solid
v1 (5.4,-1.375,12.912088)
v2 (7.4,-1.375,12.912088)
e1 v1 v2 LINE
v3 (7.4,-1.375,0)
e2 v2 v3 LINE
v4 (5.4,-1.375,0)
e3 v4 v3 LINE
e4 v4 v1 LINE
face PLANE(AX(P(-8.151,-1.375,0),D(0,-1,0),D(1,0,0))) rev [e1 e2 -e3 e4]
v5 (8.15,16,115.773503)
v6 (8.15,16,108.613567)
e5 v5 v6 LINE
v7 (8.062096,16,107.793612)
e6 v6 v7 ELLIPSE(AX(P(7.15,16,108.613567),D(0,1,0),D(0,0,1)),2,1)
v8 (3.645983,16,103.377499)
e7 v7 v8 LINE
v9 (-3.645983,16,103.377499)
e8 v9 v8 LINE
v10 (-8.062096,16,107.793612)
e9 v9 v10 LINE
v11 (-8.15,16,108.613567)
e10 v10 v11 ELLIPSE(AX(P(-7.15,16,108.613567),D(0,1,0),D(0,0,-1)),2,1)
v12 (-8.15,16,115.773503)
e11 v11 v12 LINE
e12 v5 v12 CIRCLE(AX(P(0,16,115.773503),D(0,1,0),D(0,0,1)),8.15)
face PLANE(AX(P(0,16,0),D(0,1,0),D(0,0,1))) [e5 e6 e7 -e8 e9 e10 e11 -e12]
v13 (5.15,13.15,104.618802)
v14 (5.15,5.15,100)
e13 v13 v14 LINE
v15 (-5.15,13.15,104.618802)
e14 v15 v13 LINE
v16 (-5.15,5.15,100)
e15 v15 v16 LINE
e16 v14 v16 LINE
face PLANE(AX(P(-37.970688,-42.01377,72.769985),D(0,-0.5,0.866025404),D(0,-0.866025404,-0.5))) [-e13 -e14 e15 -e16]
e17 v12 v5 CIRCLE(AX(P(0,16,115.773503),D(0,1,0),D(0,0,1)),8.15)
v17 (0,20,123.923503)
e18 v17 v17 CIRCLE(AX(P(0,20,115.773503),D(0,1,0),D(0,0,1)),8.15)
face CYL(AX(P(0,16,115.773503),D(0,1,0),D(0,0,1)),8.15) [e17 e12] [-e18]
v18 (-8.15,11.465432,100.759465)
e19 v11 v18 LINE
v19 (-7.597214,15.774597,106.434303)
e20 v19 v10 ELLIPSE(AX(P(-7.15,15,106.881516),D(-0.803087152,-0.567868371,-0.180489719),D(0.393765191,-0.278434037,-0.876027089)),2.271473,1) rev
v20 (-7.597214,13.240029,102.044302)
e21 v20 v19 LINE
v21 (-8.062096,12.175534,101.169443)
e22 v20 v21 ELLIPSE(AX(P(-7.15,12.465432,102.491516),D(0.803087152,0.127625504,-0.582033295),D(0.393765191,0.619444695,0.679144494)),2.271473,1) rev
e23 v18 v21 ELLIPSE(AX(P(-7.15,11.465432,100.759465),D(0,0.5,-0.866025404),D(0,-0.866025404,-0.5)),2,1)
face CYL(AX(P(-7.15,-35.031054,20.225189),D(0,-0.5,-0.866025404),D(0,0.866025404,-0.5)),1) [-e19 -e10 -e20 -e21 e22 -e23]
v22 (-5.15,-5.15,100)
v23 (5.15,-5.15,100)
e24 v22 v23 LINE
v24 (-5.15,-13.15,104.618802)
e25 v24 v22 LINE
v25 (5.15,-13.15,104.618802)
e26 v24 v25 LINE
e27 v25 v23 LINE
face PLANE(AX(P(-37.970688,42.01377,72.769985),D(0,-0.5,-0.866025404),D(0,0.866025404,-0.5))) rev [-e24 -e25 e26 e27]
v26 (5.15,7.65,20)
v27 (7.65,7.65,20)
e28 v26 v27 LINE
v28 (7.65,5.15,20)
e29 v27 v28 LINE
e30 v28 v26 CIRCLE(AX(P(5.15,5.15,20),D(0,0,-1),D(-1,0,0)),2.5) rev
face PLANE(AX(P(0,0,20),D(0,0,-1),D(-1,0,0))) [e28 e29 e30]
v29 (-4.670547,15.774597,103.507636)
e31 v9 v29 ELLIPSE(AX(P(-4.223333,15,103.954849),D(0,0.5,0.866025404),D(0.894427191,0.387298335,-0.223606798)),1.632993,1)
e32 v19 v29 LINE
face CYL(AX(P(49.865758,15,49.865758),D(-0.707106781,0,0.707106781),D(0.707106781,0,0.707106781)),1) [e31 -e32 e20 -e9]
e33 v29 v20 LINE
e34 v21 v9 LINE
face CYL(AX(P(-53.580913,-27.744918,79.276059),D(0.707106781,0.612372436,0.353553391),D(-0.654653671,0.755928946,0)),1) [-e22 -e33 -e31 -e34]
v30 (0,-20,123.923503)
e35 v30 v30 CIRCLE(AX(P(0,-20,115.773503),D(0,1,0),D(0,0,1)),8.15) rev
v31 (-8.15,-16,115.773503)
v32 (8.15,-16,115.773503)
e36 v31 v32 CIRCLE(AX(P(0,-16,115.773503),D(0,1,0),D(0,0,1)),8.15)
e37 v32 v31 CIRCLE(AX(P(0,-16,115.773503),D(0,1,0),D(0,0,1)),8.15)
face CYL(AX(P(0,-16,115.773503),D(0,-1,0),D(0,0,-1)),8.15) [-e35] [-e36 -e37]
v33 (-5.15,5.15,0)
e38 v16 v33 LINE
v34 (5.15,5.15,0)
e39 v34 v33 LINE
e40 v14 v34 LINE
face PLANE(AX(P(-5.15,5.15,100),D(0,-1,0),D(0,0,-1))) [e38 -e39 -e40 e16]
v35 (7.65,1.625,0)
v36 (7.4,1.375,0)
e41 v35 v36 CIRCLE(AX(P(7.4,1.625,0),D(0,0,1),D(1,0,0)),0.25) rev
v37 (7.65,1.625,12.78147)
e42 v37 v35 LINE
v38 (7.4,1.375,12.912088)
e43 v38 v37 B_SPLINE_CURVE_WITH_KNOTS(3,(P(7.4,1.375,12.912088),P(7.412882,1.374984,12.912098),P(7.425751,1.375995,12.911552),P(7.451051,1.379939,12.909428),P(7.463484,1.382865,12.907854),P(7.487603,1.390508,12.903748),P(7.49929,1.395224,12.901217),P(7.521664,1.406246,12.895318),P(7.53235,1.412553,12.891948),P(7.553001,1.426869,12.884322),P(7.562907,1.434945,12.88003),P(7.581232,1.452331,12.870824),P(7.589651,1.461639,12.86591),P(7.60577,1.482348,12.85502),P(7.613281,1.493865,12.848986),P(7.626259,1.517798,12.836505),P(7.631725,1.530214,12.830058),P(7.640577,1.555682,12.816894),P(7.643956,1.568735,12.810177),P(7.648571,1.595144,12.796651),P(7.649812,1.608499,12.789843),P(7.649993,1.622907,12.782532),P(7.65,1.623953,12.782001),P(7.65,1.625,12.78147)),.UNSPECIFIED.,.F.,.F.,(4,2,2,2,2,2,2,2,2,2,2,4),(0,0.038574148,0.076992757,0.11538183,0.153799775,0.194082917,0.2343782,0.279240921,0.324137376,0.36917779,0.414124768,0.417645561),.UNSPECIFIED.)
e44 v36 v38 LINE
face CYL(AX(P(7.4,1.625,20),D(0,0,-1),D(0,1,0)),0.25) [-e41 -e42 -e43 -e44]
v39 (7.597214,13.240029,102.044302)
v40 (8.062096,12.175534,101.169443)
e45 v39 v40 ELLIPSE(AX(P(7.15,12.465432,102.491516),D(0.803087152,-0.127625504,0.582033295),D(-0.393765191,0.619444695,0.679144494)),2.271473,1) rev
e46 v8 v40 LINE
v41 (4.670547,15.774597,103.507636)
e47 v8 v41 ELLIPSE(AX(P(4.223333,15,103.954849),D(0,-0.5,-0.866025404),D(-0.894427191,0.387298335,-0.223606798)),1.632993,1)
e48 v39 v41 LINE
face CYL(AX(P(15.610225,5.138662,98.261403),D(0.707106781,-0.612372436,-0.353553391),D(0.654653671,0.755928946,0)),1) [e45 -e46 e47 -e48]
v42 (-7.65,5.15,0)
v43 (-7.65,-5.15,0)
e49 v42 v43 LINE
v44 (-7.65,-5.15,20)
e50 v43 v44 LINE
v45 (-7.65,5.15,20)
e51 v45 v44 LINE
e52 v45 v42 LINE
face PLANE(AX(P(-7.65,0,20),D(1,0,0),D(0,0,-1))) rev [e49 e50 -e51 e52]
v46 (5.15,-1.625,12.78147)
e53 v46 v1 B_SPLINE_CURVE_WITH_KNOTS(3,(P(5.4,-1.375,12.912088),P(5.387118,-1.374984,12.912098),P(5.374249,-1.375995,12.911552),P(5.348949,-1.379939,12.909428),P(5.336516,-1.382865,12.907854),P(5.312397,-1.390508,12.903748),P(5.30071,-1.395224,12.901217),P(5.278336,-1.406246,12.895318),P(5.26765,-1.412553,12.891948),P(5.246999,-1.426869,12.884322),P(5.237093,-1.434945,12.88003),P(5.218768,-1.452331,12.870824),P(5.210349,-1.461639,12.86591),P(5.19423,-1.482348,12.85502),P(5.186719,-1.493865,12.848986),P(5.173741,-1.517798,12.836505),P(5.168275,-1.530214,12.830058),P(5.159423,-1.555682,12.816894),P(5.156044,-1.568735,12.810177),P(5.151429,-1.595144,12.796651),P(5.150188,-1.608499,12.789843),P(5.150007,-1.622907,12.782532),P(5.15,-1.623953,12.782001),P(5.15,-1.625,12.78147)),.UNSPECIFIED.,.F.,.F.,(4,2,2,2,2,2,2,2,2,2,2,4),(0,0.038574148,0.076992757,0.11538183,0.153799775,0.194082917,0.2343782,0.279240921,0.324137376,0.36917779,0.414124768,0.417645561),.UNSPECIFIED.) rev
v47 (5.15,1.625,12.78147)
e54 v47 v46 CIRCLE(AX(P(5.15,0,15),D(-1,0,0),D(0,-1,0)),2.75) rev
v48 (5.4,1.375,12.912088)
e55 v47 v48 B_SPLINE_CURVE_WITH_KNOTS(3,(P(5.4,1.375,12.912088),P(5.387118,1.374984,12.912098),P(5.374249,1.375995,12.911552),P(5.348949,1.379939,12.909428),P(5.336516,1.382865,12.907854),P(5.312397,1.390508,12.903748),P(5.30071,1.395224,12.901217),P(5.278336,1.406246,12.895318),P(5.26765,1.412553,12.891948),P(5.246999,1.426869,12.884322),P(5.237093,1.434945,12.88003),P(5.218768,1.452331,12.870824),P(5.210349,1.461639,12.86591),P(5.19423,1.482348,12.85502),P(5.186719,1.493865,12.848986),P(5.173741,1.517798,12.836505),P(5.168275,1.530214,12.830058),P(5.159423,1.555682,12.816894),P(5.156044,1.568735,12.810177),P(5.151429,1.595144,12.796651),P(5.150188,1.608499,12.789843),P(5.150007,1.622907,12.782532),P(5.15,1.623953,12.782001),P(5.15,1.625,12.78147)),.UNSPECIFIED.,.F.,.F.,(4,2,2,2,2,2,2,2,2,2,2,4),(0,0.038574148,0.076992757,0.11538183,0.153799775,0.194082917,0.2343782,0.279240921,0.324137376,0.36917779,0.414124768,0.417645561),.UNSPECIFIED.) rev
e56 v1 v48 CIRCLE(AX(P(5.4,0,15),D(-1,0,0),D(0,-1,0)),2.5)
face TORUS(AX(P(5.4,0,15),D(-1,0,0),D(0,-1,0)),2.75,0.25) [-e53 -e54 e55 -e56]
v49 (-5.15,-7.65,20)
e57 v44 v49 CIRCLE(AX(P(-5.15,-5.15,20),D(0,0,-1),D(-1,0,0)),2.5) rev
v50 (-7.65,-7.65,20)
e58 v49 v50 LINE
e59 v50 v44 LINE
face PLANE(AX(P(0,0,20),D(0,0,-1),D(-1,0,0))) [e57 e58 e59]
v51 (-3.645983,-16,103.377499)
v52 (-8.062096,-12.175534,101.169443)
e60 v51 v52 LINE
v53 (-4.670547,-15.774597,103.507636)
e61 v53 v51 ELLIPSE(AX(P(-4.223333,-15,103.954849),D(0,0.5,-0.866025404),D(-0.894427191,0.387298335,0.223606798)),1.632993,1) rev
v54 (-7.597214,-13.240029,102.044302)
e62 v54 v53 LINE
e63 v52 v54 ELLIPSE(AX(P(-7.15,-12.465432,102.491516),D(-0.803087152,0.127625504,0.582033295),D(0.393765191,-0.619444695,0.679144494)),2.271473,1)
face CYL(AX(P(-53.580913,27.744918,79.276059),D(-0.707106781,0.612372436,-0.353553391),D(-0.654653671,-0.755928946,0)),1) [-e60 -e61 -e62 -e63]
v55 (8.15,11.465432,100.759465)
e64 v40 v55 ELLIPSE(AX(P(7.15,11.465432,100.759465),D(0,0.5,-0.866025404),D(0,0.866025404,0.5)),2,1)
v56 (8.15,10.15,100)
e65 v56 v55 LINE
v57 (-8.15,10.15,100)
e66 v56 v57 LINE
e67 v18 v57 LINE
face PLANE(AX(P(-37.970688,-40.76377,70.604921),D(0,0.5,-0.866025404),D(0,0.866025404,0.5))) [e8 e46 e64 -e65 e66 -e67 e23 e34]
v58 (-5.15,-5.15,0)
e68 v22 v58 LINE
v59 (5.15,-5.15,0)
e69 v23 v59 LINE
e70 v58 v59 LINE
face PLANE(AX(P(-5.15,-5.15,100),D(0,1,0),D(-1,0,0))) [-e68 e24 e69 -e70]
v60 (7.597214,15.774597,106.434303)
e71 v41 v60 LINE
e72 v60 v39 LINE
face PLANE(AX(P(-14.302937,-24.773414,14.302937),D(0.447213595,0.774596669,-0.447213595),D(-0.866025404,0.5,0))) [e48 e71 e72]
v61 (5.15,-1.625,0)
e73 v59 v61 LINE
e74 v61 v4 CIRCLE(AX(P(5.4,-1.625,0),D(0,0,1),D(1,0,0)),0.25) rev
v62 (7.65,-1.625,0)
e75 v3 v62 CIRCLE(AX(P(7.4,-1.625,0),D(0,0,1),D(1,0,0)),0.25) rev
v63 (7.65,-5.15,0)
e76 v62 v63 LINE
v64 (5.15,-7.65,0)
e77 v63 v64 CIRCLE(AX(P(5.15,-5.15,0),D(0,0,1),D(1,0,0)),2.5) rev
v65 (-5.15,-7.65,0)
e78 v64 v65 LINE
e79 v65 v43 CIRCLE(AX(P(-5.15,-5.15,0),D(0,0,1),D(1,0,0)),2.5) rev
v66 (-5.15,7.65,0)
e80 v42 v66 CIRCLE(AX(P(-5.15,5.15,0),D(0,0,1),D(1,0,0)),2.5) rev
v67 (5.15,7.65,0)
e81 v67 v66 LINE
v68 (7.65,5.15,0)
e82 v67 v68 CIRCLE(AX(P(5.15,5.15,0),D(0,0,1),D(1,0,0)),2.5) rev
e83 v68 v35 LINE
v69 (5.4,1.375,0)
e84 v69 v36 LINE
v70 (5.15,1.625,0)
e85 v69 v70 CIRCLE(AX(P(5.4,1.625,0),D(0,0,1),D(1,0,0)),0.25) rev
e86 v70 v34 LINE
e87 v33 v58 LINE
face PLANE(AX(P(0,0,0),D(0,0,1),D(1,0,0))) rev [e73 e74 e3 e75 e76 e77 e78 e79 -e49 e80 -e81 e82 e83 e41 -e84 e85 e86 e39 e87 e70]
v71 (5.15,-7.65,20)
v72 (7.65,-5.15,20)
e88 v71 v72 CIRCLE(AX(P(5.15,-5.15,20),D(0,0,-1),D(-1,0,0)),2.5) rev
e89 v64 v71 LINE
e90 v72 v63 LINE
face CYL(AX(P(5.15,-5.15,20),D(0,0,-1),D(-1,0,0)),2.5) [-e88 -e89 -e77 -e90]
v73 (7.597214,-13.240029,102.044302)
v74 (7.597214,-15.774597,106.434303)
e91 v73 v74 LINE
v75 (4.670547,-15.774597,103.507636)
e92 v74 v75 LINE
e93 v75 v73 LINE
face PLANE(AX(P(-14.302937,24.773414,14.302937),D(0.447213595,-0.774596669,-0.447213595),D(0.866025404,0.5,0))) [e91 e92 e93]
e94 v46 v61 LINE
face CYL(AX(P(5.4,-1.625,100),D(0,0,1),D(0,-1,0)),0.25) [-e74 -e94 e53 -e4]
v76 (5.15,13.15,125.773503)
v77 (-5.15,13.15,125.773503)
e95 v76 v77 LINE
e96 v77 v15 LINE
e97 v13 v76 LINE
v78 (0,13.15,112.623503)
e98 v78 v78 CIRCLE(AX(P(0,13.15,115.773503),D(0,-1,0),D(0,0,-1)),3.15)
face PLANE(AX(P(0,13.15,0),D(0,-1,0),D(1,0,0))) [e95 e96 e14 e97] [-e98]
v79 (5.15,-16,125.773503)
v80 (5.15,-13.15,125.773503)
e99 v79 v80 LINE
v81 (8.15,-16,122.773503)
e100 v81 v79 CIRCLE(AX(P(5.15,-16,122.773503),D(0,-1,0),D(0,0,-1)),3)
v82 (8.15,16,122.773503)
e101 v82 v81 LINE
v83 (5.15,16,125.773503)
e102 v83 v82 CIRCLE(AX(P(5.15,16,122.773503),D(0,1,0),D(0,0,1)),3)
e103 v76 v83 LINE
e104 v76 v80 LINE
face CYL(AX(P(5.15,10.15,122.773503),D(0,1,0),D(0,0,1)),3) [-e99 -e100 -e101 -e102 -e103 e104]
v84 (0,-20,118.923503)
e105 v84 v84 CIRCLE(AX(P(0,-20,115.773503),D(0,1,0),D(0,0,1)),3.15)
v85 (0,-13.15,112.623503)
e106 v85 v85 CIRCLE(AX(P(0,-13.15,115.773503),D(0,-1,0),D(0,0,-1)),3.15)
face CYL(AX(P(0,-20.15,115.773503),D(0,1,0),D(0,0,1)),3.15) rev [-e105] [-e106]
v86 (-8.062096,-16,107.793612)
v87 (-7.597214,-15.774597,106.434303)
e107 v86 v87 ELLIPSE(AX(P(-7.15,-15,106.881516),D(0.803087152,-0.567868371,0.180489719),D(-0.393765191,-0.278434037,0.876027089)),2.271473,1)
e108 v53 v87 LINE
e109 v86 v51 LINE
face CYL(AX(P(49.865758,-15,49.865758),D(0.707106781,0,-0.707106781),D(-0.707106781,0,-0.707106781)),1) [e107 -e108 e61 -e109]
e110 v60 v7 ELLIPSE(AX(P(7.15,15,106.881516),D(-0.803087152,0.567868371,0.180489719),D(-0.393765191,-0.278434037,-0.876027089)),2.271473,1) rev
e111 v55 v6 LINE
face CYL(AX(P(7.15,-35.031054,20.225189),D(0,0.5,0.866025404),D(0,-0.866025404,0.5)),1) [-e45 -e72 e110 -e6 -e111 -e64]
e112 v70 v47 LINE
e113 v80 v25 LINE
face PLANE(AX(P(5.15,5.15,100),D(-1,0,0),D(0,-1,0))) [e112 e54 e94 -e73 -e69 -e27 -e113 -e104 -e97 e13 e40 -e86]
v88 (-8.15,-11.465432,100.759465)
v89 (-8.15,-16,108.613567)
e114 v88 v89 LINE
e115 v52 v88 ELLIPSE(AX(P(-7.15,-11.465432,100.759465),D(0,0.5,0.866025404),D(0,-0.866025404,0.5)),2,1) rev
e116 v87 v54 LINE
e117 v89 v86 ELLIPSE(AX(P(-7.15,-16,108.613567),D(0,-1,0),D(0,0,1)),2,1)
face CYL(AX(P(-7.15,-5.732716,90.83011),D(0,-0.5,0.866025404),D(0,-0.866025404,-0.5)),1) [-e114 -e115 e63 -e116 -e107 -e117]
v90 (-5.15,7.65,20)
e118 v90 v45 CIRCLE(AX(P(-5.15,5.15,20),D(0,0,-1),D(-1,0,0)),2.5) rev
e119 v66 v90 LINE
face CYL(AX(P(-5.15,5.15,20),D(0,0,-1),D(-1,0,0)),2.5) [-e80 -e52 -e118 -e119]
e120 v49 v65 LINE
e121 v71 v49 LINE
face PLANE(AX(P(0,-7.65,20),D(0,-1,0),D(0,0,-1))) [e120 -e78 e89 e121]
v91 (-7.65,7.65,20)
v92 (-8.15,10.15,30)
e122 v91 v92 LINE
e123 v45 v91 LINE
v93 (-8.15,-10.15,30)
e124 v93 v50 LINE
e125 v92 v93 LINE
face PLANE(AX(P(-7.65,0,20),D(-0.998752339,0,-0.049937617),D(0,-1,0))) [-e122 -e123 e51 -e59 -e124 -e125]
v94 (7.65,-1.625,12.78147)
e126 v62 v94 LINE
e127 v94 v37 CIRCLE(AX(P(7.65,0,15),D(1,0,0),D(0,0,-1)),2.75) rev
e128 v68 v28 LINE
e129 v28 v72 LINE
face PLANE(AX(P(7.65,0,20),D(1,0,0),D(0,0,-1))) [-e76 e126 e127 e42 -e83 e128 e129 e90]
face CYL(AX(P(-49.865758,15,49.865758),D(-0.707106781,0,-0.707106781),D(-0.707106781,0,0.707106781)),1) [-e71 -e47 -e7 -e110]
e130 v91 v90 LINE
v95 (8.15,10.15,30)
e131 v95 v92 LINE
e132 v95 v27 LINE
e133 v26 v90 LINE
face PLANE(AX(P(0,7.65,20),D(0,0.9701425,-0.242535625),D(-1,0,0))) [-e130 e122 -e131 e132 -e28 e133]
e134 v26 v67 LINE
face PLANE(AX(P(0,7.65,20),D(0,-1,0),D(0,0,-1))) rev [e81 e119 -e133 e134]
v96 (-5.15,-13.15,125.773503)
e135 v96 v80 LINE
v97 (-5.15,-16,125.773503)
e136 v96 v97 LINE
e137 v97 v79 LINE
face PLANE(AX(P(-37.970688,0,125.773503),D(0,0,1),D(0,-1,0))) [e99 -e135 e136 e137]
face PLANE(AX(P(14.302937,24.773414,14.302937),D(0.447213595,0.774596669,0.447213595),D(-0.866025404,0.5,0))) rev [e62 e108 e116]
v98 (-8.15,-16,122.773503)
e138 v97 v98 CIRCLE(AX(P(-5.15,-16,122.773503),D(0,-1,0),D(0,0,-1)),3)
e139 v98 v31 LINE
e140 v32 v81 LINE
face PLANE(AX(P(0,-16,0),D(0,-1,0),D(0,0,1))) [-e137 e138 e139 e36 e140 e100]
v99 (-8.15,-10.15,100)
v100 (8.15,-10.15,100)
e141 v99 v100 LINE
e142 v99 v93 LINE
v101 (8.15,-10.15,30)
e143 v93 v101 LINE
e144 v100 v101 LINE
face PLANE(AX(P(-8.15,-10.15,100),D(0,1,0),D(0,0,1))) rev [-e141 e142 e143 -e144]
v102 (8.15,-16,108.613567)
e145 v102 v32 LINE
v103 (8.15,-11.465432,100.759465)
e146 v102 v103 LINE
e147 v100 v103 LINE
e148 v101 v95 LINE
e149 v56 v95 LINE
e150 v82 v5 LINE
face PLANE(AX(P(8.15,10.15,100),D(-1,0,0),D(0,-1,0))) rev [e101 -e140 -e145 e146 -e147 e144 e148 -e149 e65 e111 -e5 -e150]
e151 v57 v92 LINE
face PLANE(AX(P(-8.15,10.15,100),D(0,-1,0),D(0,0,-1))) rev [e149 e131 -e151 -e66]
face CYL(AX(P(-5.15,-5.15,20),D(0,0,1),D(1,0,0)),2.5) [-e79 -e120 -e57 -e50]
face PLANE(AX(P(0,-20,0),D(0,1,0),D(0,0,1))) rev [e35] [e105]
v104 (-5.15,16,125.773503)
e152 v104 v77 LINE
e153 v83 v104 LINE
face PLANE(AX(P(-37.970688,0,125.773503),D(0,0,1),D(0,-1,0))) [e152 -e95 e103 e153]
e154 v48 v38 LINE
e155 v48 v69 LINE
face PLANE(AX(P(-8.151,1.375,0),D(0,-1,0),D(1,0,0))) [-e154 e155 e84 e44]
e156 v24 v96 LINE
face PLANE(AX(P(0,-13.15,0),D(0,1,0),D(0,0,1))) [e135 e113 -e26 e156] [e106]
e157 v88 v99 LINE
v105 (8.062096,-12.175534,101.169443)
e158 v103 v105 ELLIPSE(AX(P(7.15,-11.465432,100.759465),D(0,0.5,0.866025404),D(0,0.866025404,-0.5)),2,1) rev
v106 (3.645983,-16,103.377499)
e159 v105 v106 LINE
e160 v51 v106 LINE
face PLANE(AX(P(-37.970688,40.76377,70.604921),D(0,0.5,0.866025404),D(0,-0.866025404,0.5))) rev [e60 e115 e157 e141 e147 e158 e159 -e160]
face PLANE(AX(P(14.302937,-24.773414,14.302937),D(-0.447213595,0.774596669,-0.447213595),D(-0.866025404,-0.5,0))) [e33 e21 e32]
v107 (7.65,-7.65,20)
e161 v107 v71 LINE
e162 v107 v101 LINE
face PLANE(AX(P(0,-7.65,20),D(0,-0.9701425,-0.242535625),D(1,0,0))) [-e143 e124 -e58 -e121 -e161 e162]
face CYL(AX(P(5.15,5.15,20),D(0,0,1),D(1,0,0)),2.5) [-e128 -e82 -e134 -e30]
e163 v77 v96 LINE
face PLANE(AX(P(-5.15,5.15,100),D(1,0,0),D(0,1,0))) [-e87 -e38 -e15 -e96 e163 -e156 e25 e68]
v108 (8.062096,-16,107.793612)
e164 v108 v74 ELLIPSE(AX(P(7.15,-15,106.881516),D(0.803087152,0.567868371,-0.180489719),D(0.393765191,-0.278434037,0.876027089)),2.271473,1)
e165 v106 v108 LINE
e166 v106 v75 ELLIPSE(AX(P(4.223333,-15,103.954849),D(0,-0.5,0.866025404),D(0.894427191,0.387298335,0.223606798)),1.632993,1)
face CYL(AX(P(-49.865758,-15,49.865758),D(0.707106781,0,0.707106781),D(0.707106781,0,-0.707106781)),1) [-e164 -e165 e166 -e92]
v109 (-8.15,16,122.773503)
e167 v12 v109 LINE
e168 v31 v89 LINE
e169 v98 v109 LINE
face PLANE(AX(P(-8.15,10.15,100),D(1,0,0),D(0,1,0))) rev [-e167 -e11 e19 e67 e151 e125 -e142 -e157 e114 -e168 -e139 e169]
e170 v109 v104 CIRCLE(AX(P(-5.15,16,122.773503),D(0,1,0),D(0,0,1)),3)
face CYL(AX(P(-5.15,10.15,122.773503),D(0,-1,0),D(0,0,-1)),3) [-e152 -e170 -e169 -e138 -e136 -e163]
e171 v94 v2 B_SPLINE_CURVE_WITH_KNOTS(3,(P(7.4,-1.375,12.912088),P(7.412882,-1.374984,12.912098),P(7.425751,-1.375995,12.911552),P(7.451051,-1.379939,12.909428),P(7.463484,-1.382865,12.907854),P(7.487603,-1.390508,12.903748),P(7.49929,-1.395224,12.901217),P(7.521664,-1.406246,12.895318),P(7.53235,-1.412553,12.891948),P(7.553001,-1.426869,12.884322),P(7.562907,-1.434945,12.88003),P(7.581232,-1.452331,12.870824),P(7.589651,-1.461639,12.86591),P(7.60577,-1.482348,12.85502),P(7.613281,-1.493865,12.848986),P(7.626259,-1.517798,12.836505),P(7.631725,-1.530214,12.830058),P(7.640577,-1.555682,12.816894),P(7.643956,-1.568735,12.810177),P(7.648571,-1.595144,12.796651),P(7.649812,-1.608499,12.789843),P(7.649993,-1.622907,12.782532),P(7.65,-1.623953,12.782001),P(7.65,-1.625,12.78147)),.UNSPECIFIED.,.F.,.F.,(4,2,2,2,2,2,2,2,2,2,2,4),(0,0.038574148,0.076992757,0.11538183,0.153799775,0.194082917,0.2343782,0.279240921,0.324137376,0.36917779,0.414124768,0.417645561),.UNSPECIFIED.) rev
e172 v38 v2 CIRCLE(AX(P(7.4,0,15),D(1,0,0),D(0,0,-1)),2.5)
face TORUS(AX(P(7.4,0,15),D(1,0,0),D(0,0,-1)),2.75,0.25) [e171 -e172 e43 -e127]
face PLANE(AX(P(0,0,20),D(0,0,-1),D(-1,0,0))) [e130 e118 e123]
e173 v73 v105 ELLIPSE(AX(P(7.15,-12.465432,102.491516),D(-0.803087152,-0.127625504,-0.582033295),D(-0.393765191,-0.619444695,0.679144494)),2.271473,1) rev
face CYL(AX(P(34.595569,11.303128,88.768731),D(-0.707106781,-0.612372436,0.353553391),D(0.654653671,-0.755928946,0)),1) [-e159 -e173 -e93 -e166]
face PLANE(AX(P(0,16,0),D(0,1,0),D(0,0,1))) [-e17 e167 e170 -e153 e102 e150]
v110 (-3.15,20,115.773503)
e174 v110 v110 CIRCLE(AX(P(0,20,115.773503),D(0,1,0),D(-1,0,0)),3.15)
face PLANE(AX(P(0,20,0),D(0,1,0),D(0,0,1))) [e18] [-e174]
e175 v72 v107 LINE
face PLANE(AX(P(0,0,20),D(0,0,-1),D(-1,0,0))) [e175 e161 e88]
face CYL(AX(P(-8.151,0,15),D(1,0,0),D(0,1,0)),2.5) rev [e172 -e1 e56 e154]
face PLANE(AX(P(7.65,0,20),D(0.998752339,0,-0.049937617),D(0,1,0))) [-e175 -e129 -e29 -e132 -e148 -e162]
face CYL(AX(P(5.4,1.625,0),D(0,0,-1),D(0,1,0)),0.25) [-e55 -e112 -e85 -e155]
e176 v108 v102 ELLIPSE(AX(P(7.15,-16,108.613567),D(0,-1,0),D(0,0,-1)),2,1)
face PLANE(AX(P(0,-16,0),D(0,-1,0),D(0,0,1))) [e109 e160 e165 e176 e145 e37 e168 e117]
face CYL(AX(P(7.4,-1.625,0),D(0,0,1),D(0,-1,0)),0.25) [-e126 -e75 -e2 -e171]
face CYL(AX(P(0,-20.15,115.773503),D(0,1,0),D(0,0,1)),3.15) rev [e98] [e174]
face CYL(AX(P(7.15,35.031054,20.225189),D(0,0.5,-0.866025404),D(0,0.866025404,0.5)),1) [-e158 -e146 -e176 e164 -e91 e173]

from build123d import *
from OCP.BRepFilletAPI import BRepFilletAPI_MakeChamfer

# Parameters (mm, degrees)
SKETCH_1_W          = 16.3
SKETCH_1_H          = 20.3
SKETCH_1_W_2        = 10.3
SKETCH_1_H_2        = 10.3
EXTRUDE_1_DEPTH     = 100
SKETCH_2_W          = 16.3
SKETCH_2_H          = 20.3
SKETCH_2_W_2        = 15.3
SKETCH_2_H_2        = 15.3
CUT_EXTRUDE_1_DEPTH = 20
CHAMFER_1_SIZE      = 2.5
CHAMFER_1_SIZE_2    = 10
CUT_EXTRUDE_2_REACH = 103.748
FILLET_1_R          = 0.25
FILLET_2_R          = 2.5
EXTRUDE_2_REACH     = 103.827
EXTRUDE_3_DEPTH     = 3
EXTRUDE_START       = -16.3
EXTRUDE_4_DEPTH     = 3
SKETCH_5_R          = 3.15
CUT_EXTRUDE_3_DEPTH = 133.323416217
SKETCH_6_W          = 16.3
SKETCH_6_H          = 30
SKETCH_6_R          = 3.15
CUT_EXTRUDE_4_DEPTH = 0.15
CUT_EXTRUDE_START   = -40.15
SKETCH_6_2_W        = 16.3
SKETCH_6_2_H        = 10
SKETCH_6_2_H_2      = 20
SKETCH_6_2_R        = 3.15
CUT_EXTRUDE_5_DEPTH = 0.15
CHAMFER_2_SIZE      = 0.5
CHAMFER_2_SIZE_2    = 10
SKETCH_7_R          = 15
SKETCH_7_W          = 16.3
SKETCH_7_H          = 20.08660254
CUT_EXTRUDE_6_DEPTH = 4
SKETCH_8_W          = 10.3
SKETCH_8_H          = 21.501273041
SKETCH_8_R          = 3.15
EXTRUDE_5_DEPTH     = 2
EXTRUDE_START_2     = 28.3
SKETCH_8_2_W        = 10.3
SKETCH_8_2_H        = 1.501273041
SKETCH_8_2_H_2      = 20
SKETCH_8_2_R        = 3.15
EXTRUDE_6_DEPTH     = 2
FILLET_3_R          = 3
CHAMFER_START       = 29
CHAMFER_3_OUTLINE_W = 8
CHAMFER_3_OUTLINE_H = 9
CHAMFER_3_DEPTH     = 2.982339926
CHAMFER_START_2     = -31.982339926
CHAMFER_4_OUTLINE_W = 8
CHAMFER_4_OUTLINE_H = 9
CHAMFER_4_DEPTH     = 1.788854382
CHAMFER_5_OUTLINE_W = 8
CHAMFER_5_OUTLINE_H = 9
CHAMFER_5_DEPTH     = 2.982339926
CHAMFER_6_OUTLINE_W = 8
CHAMFER_6_OUTLINE_H = 9
CHAMFER_6_DEPTH     = 1.788854382
FILLET_4_R          = 1


with BuildPart() as part:
    # 草图1 → 凸台-拉伸1 (new body)
    with BuildSketch(Plane.XY):
        Rectangle(SKETCH_1_W, SKETCH_1_H)
        Rectangle(SKETCH_1_W_2, SKETCH_1_H_2, mode=Mode.SUBTRACT)
    extrude(amount=EXTRUDE_1_DEPTH)

    # 草图2 → 切除-拉伸1 (cut)
    with BuildSketch(Plane(origin=(0, 0, 0), x_dir=(-1, 0, 0), z_dir=(0, 0, -1))):
        Rectangle(SKETCH_2_W, SKETCH_2_H)
        Rectangle(SKETCH_2_W_2, SKETCH_2_H_2, mode=Mode.SUBTRACT)
    extrude(amount=-CUT_EXTRUDE_1_DEPTH, mode=Mode.SUBTRACT)

    # 倒角1
    chamfer_1_edges_1 = [part.edges().sort_by_distance(p)[0] for p in [
        (0, -10.15, 20),
    ]]
    chamfer_1_side_1 = [part.faces().sort_by_distance(p)[0] for p in [
        (0, -10.1, 20),
    ]]
    chamfer_1_edges_2 = [part.edges().sort_by_distance(p)[0] for p in [
        (0, 10.15, 20),
    ]]
    chamfer_1_side_2 = [part.faces().sort_by_distance(p)[0] for p in [
        (0, 10.15, 20.05),
    ]]
    chamfer_1 = BRepFilletAPI_MakeChamfer(part.part.solid().wrapped)
    for e in chamfer_1_edges_1:
        chamfer_1.Add(CHAMFER_1_SIZE - 0.0001, CHAMFER_1_SIZE_2 - 0.0001, e.wrapped, chamfer_1_side_1[0].wrapped)
    for e in chamfer_1_edges_2:
        chamfer_1.Add(CHAMFER_1_SIZE_2 - 0.0001, CHAMFER_1_SIZE - 0.0001, e.wrapped, chamfer_1_side_2[0].wrapped)
    add(Compound.cast(chamfer_1.Shape()), mode=Mode.REPLACE)  # a hair under: the kernel refuses the full size

    # 草图3 → 切除-拉伸2 (cut, up to next)
    with BuildSketch(Plane(origin=(7.65, 0, 0), x_dir=(0, 0, -1), z_dir=(1, 0, 0)), mode=Mode.PRIVATE) as cut_extrude_2_sk1:
        with BuildLine():
            Line((0, 1.375), (-12.912088364, 1.375))
            ThreePointArc((-12.912088364, 1.375), (-12.605237059, 0.717711958), (-12.5, 0))
            ThreePointArc((-12.5, 0), (-12.605237059, -0.717711958), (-12.912088364, -1.375))
            Line((-12.912088364, -1.375), (0, -1.375))
            Line((0, -1.375), (0, 1.375))
        make_face()
    cut_extrude_2_tool1 = extrude(cut_extrude_2_sk1.sketch, amount=-CUT_EXTRUDE_2_REACH, mode=Mode.PRIVATE) & part.part
    # 草图3 → 切除-拉伸2 (cut, up to next)
    with BuildSketch(Plane(origin=(7.65, 0, 0), x_dir=(0, 0, -1), z_dir=(1, 0, 0)), mode=Mode.PRIVATE) as cut_extrude_2_sk2:
        with BuildLine():
            Line((-15, -1.375), (-15, 1.375))
            Line((-15, 1.375), (-12.912088364, 1.375))
            ThreePointArc((-12.912088364, 1.375), (-17.5, 0), (-12.912088364, -1.375))
            Line((-12.912088364, -1.375), (-15, -1.375))
        make_face()
    cut_extrude_2_tool2 = extrude(cut_extrude_2_sk2.sketch, amount=-CUT_EXTRUDE_2_REACH, mode=Mode.PRIVATE) & part.part
    # 草图3 → 切除-拉伸2 (cut, up to next)
    with BuildSketch(Plane(origin=(7.65, 0, 0), x_dir=(0, 0, -1), z_dir=(1, 0, 0)), mode=Mode.PRIVATE) as cut_extrude_2_sk3:
        with BuildLine():
            Line((-12.912088364, 1.375), (-15, 1.375))
            Line((-15, 1.375), (-15, -1.375))
            Line((-15, -1.375), (-12.912088364, -1.375))
            ThreePointArc((-12.912088364, -1.375), (-12.605237059, -0.717711958), (-12.5, 0))
            ThreePointArc((-12.5, 0), (-12.605237059, 0.717711958), (-12.912088364, 1.375))
        make_face()
    cut_extrude_2_tool3 = extrude(cut_extrude_2_sk3.sketch, amount=-CUT_EXTRUDE_2_REACH, mode=Mode.PRIVATE) & part.part
    # 草图3 → 切除-拉伸2 (cut, up to next)
    with BuildSketch(Plane(origin=(7.65, 0, 0), x_dir=(0, 0, -1), z_dir=(1, 0, 0)), mode=Mode.PRIVATE) as cut_extrude_2_sk4:
        with BuildLine():
            Line((-15, -1.375), (-15, 1.375))
            Line((-15, 1.375), (-12.912088364, 1.375))
            ThreePointArc((-12.912088364, 1.375), (-17.5, 0), (-12.912088364, -1.375))
            Line((-12.912088364, -1.375), (-15, -1.375))
        make_face()
    cut_extrude_2_tool4 = extrude(cut_extrude_2_sk4.sketch, amount=-CUT_EXTRUDE_2_REACH, mode=Mode.PRIVATE) & part.part
    # 草图3 → 切除-拉伸2 (cut, up to next)
    with BuildSketch(Plane(origin=(7.65, 0, 0), x_dir=(0, 0, -1), z_dir=(1, 0, 0)), mode=Mode.PRIVATE) as cut_extrude_2_sk5:
        with BuildLine():
            Line((-12.912088364, 1.375), (-15, 1.375))
            Line((-15, 1.375), (-15, -1.375))
            Line((-15, -1.375), (-12.912088364, -1.375))
            ThreePointArc((-12.912088364, -1.375), (-12.605237059, -0.717711958), (-12.5, 0))
            ThreePointArc((-12.5, 0), (-12.605237059, 0.717711958), (-12.912088364, 1.375))
        make_face()
    cut_extrude_2_tool5 = extrude(cut_extrude_2_sk5.sketch, amount=-CUT_EXTRUDE_2_REACH, mode=Mode.PRIVATE) & part.part
    add(cut_extrude_2_tool1.solids().sort_by_distance((7.65, 0, 6.316826))[0], mode=Mode.SUBTRACT)
    add(cut_extrude_2_tool2.solids().sort_by_distance((7.65, 0, 15.588772))[0], mode=Mode.SUBTRACT)
    add(cut_extrude_2_tool3.solids().sort_by_distance((7.65, 0, 13.813143))[0], mode=Mode.SUBTRACT)
    add(cut_extrude_2_tool4.solids().sort_by_distance((7.65, 0, 15.588772))[0], mode=Mode.SUBTRACT)
    add(cut_extrude_2_tool5.solids().sort_by_distance((7.65, 0, 13.813143))[0], mode=Mode.SUBTRACT)

    # 圆角1
    fillet_1_edges = [part.edges().sort_by_distance(p)[0] for p in [
        (5.15, 0, 17.5),
        (7.65, 1.375, 6.456044182),
        (5.15, -1.375, 6.456044182),
        (7.65, 0, 17.5),
        (7.65, -1.375, 6.456044182),
        (5.15, 1.375, 6.456044182),
    ]]
    fillet(fillet_1_edges, radius=FILLET_1_R)

    # 圆角2
    fillet_2_edges = [part.edges().sort_by_distance(p)[0] for p in [
        (-7.65, 7.65, 10),
        (7.65, 7.65, 10),
        (7.65, -7.65, 10),
        (-7.65, -7.65, 10),
    ]]
    fillet(fillet_2_edges, radius=FILLET_2_R)

    # 凸台-拉伸2: up to this face of the body (flat: up to its plane)
    extrude_2_end = Plane(part.part.faces().sort_by_distance((-8.15, 0, 60.573246373))[0])
    # 草图4 → 凸台-拉伸2 (add, up to the picked face)
    with BuildSketch(Plane(origin=(8.15, 0, 0), x_dir=(0, 0, -1), z_dir=(1, 0, 0)), mode=Mode.PRIVATE) as extrude_2_sk1:
        Polygon((-100, 5.15), (-100, 10.15), (-105.773502692, 20.15), (-125.773502692, 20.15), (-125.773502692, 15.15), (-105.773502692, 15.15), align=None)
    extrude_2_tool1 = split(extrude(extrude_2_sk1.sketch, amount=-EXTRUDE_2_REACH, mode=Mode.PRIVATE), bisect_by=extrude_2_end, keep=Keep.BOTH, mode=Mode.PRIVATE)
    # 草图4 → 凸台-拉伸2 (add, up to the picked face)
    with BuildSketch(Plane(origin=(8.15, 0, 0), x_dir=(0, 0, -1), z_dir=(1, 0, 0)), mode=Mode.PRIVATE) as extrude_2_sk2:
        Polygon((-100, -10.15), (-100, -5.15), (-105.773502692, -15.15), (-125.773502692, -15.15), (-125.773502692, -20.15), (-105.773502692, -20.15), align=None)
    extrude_2_tool2 = split(extrude(extrude_2_sk2.sketch, amount=-EXTRUDE_2_REACH, mode=Mode.PRIVATE), bisect_by=extrude_2_end, keep=Keep.BOTH, mode=Mode.PRIVATE)
    add(extrude_2_tool1.solids().sort_by(Axis((8.15, 16.529954, 112.886751), (-1, 0, 0)))[0])
    add(extrude_2_tool2.solids().sort_by(Axis((8.15, -16.529954, 112.886751), (-1, 0, 0)))[0])

    # 草图4<3> → 凸台-拉伸3 (add)
    with BuildSketch(Plane(origin=(8.15, 0, 0), x_dir=(0, 0, -1), z_dir=(1, 0, 0))):
        Polygon((-100, -5.15), (-100, 5.15), (-105.773502692, 15.15), (-125.773502692, 15.15), (-125.773502692, -15.15), (-105.773502692, -15.15), align=None)
    extrude(amount=-EXTRUDE_3_DEPTH)

    # 草图4<4> → 凸台-拉伸4 (add)
    with BuildSketch(Plane(origin=(8.15, 0, 0), x_dir=(0, 0, -1), z_dir=(1, 0, 0)).offset(EXTRUDE_START)):
        Polygon((-100, -5.15), (-100, 5.15), (-105.773502692, 15.15), (-125.773502692, 15.15), (-125.773502692, -15.15), (-105.773502692, -15.15), align=None)
    extrude(amount=EXTRUDE_4_DEPTH)

    # 草图5 → 切除-拉伸3 (cut, through all)
    with BuildSketch(Plane(origin=(0, 20.15, 0), x_dir=(1, 0, 0), z_dir=(0, 1, 0))):
        with Locations(Location((0, -115.773502692, 0), (0, 0, 270))):
            Circle(SKETCH_5_R)
    extrude(amount=-CUT_EXTRUDE_3_DEPTH, mode=Mode.SUBTRACT)

    # 草图6 → 切除-拉伸4 (cut)
    with BuildSketch(Plane(origin=(0, 20.15, 0), x_dir=(1, 0, 0), z_dir=(0, 1, 0))):
        with Locations((0, -110.773502692)):
            Rectangle(SKETCH_6_W, SKETCH_6_H)
        with Locations(Location((0, -115.773502692, 0), (0, 0, 180))):
            Circle(SKETCH_6_R, mode=Mode.SUBTRACT)
    extrude(amount=-CUT_EXTRUDE_4_DEPTH, mode=Mode.SUBTRACT)

    # 草图6<2> → 切除-拉伸5 (cut)
    # profile 1 of 2: a face of its own
    with BuildSketch(Plane(origin=(0, 20.15, 0), x_dir=(1, 0, 0), z_dir=(0, 1, 0)).offset(CUT_EXTRUDE_START)):
        with Locations((0, -100.773502692)):
            Rectangle(SKETCH_6_2_W, SKETCH_6_2_H)
    # profile 2 of 2: a face of its own
    with BuildSketch(Plane(origin=(0, 20.15, 0), x_dir=(1, 0, 0), z_dir=(0, 1, 0)).offset(CUT_EXTRUDE_START)):
        with Locations((0, -115.773502692)):
            Rectangle(SKETCH_6_2_W, SKETCH_6_2_H_2)
        with Locations(Location((0, -115.773502692, 0), (0, 0, 180))):
            Circle(SKETCH_6_2_R, mode=Mode.SUBTRACT)
    extrude(amount=-CUT_EXTRUDE_5_DEPTH, mode=Mode.SUBTRACT)

    # 倒角2
    chamfer_2_edges_1 = [part.edges().sort_by_distance(p)[0] for p in [
        (-8.15, 0, 20),
    ]]
    chamfer_2_side_1 = [part.faces().sort_by_distance(p)[0] for p in [
        (-8.14, 0, 20),
    ]]
    chamfer_2_edges_2 = [part.edges().sort_by_distance(p)[0] for p in [
        (8.15, 0, 20),
    ]]
    chamfer_2_side_2 = [part.faces().sort_by_distance(p)[0] for p in [
        (8.15, 0, 20.01),
    ]]
    chamfer_2 = BRepFilletAPI_MakeChamfer(part.part.solid().wrapped)
    for e in chamfer_2_edges_1:
        chamfer_2.Add(CHAMFER_2_SIZE - 0.0001, CHAMFER_2_SIZE_2 - 0.0001, e.wrapped, chamfer_2_side_1[0].wrapped)
    for e in chamfer_2_edges_2:
        chamfer_2.Add(CHAMFER_2_SIZE_2 - 0.0001, CHAMFER_2_SIZE - 0.0001, e.wrapped, chamfer_2_side_2[0].wrapped)
    add(Compound.cast(chamfer_2.Shape()), mode=Mode.REPLACE)  # a hair under: the kernel refuses the full size

    # 草图7 → 切除-拉伸6 (cut)
    # profile 1 of 3: a face of its own
    with BuildSketch(Plane(origin=(0, 20, 0), x_dir=(1, 0, 0), z_dir=(0, 1, 0))):
        with Locations((0, -115.773502692)):
            Circle(SKETCH_7_R)
        with Locations((0, -115.730201422)):
            Rectangle(SKETCH_7_W, SKETCH_7_H, mode=Mode.SUBTRACT)
    # profile 2 of 3: a face of its own
    with BuildSketch(Plane(origin=(0, 20, 0), x_dir=(1, 0, 0), z_dir=(0, 1, 0))):
        with BuildLine():
            Line((8.15, -125.773502692), (8.15, -115.773502692))
            ThreePointArc((8.15, -115.773502692), (1.2e-08, -123.923502692), (-8.15, -115.773502716))
            Line((-8.15, -115.773502716), (-8.15, -125.773502692))
            Line((-8.15, -125.773502692), (8.15, -125.773502692))
        make_face()
    # profile 3 of 3: a face of its own
    with BuildSketch(Plane(origin=(0, 20, 0), x_dir=(1, 0, 0), z_dir=(0, 1, 0))):
        with BuildLine():
            ThreePointArc((-8.15, -115.773502716), (-1.2e-08, -107.623502692), (8.15, -115.773502692))
            Line((8.15, -115.773502692), (8.15, -105.686900152))
            Line((8.15, -105.686900152), (-8.15, -105.686900152))
            Line((-8.15, -105.686900152), (-8.15, -115.773502716))
        make_face()
    cut_extrude_6 = extrude(amount=-CUT_EXTRUDE_6_DEPTH, mode=Mode.SUBTRACT)

    # 镜向1: 切除-拉伸6 across plane
    add(cut_extrude_6.mirror(Plane.ZX), mode=Mode.SUBTRACT)

    # 草图8 → 凸台-拉伸5 (add)
    with BuildSketch(Plane.XZ.offset(-15.15)):
        with Locations((0, 115.022866171)):
            Rectangle(SKETCH_8_W, SKETCH_8_H)
        with Locations(Location((0, 115.773502692, 0), (0, 0, 180))):
            Circle(SKETCH_8_R, mode=Mode.SUBTRACT)
    extrude(amount=EXTRUDE_5_DEPTH)

    # 草图8<2> → 凸台-拉伸6 (add)
    # profile 1 of 2: a face of its own
    with BuildSketch(Plane.XZ.offset(-15.15).offset(EXTRUDE_START_2)):
        with Locations((0, 105.022866171)):
            Rectangle(SKETCH_8_2_W, SKETCH_8_2_H)
    # profile 2 of 2: a face of its own
    with BuildSketch(Plane.XZ.offset(-15.15).offset(EXTRUDE_START_2)):
        with Locations((0, 115.773502692)):
            Rectangle(SKETCH_8_2_W, SKETCH_8_2_H_2)
        with Locations(Location((0, 115.773502692, 0), (0, 0, 180))):
            Circle(SKETCH_8_2_R, mode=Mode.SUBTRACT)
    extrude(amount=EXTRUDE_6_DEPTH)

    # 圆角3
    fillet_3_edges = [part.edges().sort_by_distance(p)[0] for p in [
        (8.15, 0, 125.773502692),
        (-8.15, 0, 125.773502692),
    ]]
    fillet(fillet_3_edges, radius=FILLET_3_R - 0.0001)  # a hair under: the kernel refuses the full size

    # 倒角3: read off the stored shape, not the designer's step
    # 倒角3 outline → 倒角3 (cut)
    with BuildSketch(Plane(origin=(0, 0, 0), x_dir=(0.894427190999916, 0.387298334620742, -0.22360679774997855), z_dir=(0.447213595499958, -0.7745966692414838, 0.447213595499957)).offset(CHAMFER_START)):
        with Locations((-23, 97.5)):
            Rectangle(CHAMFER_3_OUTLINE_W, CHAMFER_3_OUTLINE_H)
    extrude(amount=CHAMFER_3_DEPTH, mode=Mode.SUBTRACT)

    # 倒角4: read off the stored shape, not the designer's step
    # 倒角4 outline → 倒角4 (cut)
    with BuildSketch(Plane(origin=(0, 0, 0), x_dir=(0.8944271909999162, -0.3872983346207414, 0.2236067977499782), z_dir=(0.44721359549995726, 0.7745966692414843, -0.4472135954999572)).offset(CHAMFER_START_2)):
        with Locations((23, -97.5)):
            Rectangle(CHAMFER_4_OUTLINE_W, CHAMFER_4_OUTLINE_H)
    extrude(amount=CHAMFER_4_DEPTH, mode=Mode.SUBTRACT)

    # 倒角5: read off the stored shape, not the designer's step
    # 倒角5 outline → 倒角5 (cut)
    with BuildSketch(Plane(origin=(0, 0, 0), x_dir=(0.8944271909999162, -0.3872983346207414, -0.2236067977499782), z_dir=(0.44721359549995726, 0.7745966692414843, 0.4472135954999572)).offset(CHAMFER_START)):
        with Locations((-23, -97.5)):
            Rectangle(CHAMFER_5_OUTLINE_W, CHAMFER_5_OUTLINE_H)
    extrude(amount=CHAMFER_5_DEPTH, mode=Mode.SUBTRACT)

    # 倒角6: read off the stored shape, not the designer's step
    # 倒角6 outline → 倒角6 (cut)
    with BuildSketch(Plane(origin=(0, 0, 0), x_dir=(0.8944271909999162, 0.3872983346207414, 0.2236067977499782), z_dir=(0.44721359549995726, -0.7745966692414843, -0.4472135954999572)).offset(CHAMFER_START_2)):
        with Locations((23, 97.5)):
            Rectangle(CHAMFER_6_OUTLINE_W, CHAMFER_6_OUTLINE_H)
    extrude(amount=CHAMFER_6_DEPTH, mode=Mode.SUBTRACT)

    # 圆角4
    fillet_4_edges = [part.edges().sort_by_distance(p)[0] for p in [
        (-8.15, 14.267949192, 104.377499075),
        (-6.15, 14.267949192, 102.377499075),
        (-6.15, 16, 105.377499075),
        (6.15, 16, 105.377499075),
        (6.15, 14.267949192, 102.377499075),
        (8.15, 14.267949192, 104.377499075),
        (-8.15, -14.267949192, 104.377499075),
        (-6.15, -14.267949192, 102.377499075),
        (-6.15, -16, 105.377499075),
        (6.15, -14.267949192, 102.377499075),
        (8.15, -14.267949192, 104.377499075),
        (6.15, -16, 105.377499075),
    ]]
    fillet(fillet_4_edges, radius=FILLET_4_R)


solid = part.part
